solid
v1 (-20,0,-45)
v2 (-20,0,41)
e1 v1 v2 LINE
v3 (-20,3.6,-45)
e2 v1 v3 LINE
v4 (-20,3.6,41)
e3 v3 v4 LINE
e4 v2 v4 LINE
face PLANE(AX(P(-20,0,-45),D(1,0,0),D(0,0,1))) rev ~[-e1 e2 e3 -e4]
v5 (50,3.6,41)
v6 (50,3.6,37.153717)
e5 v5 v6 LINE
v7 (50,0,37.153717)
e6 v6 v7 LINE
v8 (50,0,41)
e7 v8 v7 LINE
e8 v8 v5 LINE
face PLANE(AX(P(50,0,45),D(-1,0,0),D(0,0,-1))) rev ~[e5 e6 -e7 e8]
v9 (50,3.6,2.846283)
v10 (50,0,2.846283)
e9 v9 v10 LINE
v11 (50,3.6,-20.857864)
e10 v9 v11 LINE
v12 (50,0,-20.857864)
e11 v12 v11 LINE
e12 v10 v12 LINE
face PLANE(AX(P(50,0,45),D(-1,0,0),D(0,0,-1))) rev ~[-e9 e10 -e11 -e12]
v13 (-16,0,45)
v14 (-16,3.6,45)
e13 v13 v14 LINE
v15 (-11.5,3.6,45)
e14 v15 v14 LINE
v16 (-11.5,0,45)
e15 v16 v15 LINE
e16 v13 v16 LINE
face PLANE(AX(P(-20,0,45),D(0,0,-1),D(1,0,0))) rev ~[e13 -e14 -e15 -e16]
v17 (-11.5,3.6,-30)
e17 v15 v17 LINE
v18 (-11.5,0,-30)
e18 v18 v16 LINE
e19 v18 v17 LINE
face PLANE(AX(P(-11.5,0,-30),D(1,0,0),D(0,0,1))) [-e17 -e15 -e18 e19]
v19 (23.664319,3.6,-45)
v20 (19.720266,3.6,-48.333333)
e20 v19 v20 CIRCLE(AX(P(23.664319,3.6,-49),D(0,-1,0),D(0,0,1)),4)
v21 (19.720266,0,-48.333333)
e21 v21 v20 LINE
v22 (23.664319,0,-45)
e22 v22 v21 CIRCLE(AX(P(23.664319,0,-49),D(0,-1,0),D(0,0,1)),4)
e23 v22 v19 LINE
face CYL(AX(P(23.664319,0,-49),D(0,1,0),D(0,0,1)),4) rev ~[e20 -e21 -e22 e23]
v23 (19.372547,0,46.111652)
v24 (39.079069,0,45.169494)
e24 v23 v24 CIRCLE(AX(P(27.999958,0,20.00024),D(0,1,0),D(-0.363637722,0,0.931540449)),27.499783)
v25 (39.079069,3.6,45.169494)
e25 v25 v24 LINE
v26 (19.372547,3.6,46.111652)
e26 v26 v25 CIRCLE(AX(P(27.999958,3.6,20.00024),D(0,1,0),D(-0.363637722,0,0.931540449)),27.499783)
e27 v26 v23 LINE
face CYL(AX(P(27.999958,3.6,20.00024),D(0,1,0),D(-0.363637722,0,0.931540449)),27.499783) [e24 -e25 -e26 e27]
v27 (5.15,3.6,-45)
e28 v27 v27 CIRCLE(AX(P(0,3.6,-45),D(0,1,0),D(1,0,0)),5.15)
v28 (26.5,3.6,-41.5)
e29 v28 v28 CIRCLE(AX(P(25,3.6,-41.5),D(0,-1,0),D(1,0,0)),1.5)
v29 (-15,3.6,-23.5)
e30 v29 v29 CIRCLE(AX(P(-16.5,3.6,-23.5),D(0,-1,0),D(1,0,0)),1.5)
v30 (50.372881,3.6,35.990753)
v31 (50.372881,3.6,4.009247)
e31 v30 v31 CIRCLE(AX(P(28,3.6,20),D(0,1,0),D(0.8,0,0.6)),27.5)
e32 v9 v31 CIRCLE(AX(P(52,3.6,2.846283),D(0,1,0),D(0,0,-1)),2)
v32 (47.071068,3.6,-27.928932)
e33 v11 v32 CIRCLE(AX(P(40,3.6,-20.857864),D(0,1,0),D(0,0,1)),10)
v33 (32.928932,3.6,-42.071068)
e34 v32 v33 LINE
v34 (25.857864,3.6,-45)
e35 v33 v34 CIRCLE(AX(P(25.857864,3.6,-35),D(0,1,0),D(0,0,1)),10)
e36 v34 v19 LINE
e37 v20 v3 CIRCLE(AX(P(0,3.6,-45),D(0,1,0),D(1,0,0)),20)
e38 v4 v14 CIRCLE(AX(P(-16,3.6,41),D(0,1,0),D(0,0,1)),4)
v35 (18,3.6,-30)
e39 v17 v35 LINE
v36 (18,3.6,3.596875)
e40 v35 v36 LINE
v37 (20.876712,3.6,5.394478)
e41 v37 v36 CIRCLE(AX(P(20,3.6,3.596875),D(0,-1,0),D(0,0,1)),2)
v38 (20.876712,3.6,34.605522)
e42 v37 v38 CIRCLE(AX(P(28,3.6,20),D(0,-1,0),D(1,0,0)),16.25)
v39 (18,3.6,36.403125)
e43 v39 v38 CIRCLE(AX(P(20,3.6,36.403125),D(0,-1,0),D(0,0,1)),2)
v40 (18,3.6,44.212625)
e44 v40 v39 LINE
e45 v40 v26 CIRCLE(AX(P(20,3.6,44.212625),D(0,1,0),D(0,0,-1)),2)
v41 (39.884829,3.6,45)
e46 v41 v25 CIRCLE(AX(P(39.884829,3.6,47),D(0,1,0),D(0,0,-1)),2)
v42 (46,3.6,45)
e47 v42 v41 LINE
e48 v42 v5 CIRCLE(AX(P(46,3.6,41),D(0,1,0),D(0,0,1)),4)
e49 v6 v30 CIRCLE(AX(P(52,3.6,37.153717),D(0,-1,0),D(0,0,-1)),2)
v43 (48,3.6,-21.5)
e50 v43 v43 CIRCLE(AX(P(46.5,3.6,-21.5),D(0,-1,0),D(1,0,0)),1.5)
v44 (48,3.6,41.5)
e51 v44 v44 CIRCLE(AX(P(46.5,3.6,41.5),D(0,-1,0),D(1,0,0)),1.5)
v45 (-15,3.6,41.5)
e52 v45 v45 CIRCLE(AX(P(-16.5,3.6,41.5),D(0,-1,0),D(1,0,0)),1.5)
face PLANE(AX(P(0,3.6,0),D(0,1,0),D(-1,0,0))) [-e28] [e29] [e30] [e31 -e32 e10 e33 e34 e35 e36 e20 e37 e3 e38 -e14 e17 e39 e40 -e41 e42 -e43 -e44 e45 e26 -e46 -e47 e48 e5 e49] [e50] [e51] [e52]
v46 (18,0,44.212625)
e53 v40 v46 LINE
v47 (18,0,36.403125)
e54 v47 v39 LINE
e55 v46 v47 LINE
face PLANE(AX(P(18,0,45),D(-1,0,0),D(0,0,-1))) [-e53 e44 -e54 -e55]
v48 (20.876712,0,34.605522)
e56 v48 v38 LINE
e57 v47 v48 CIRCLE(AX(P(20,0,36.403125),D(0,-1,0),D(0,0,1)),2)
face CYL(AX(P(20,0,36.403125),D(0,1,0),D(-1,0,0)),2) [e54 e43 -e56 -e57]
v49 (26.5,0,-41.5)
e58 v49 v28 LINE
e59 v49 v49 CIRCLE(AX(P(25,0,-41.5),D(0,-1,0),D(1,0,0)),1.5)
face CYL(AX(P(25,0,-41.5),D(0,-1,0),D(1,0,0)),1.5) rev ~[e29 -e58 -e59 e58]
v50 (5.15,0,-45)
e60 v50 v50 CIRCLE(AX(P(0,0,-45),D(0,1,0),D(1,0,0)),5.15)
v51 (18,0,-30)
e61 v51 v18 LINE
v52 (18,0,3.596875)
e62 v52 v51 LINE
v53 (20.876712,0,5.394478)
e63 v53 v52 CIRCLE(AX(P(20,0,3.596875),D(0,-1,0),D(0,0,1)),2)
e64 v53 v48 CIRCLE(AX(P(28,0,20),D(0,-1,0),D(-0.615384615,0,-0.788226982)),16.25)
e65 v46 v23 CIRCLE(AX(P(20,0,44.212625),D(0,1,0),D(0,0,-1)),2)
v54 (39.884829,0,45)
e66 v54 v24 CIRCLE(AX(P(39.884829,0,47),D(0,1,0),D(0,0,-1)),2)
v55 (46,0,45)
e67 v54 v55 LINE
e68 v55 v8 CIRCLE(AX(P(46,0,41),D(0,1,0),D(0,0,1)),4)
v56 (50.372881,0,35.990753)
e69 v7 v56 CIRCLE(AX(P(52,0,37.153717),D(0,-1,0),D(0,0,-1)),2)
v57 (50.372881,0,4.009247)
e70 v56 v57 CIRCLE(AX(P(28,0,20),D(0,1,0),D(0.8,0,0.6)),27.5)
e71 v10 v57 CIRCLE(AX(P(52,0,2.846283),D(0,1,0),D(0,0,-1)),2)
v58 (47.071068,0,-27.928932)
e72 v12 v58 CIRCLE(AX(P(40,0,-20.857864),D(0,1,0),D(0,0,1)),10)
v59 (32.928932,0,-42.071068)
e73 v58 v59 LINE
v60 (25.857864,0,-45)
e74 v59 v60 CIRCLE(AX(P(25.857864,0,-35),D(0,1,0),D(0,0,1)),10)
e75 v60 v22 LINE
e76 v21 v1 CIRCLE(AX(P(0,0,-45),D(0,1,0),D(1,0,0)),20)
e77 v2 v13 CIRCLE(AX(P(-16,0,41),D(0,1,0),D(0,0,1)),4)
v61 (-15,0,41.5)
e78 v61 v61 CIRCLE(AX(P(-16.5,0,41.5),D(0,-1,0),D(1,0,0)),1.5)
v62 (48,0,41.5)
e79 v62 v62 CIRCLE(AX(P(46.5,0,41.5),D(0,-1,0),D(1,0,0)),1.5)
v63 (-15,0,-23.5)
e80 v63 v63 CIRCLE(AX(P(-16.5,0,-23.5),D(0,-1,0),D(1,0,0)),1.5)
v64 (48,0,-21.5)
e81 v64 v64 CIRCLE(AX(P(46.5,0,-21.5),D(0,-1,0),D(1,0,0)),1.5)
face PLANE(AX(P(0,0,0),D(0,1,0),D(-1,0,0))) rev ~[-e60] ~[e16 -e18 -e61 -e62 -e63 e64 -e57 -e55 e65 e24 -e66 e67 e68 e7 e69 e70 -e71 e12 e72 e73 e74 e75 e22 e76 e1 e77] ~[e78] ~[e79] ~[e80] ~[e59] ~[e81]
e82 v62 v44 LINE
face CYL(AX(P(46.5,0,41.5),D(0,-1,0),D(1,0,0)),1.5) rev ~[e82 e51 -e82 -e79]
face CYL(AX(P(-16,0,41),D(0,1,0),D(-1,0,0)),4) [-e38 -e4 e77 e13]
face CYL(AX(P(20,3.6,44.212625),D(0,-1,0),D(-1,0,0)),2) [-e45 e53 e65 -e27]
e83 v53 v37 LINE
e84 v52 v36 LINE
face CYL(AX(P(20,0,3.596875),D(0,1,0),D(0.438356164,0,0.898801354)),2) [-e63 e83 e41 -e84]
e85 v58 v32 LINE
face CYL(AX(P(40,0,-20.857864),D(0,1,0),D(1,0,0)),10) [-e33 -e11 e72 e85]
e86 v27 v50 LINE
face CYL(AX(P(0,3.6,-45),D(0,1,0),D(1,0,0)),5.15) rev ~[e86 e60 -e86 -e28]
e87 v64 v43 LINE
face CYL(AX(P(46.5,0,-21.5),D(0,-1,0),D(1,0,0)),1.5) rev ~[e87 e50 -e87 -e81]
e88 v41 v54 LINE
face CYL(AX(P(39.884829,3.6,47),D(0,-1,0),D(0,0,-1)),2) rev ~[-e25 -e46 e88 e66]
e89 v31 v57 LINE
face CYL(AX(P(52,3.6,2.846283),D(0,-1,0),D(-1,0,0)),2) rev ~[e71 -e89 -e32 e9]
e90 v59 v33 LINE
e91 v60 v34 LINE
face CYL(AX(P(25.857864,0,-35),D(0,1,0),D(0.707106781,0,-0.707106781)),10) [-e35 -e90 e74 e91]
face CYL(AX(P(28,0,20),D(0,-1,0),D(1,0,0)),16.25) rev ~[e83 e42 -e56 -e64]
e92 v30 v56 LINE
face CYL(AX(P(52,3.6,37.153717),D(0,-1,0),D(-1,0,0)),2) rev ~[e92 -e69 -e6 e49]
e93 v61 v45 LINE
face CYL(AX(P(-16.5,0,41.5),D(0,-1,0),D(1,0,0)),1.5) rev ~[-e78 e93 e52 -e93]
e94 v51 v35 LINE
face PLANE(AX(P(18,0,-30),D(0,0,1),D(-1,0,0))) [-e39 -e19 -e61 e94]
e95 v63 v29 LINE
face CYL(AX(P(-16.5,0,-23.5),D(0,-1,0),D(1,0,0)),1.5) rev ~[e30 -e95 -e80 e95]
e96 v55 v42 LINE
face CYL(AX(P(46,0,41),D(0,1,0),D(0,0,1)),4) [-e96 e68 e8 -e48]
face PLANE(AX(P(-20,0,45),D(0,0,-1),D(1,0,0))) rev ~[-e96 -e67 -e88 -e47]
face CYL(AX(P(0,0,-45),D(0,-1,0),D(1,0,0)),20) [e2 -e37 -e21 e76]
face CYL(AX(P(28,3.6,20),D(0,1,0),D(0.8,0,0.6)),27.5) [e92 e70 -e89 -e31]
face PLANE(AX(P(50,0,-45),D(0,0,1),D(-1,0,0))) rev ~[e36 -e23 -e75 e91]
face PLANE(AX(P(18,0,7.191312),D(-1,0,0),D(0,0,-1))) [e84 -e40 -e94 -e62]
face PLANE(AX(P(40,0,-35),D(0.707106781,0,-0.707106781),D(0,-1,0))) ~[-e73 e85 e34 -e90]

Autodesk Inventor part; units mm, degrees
ref_plane "YZ Plane" through (0, 0, 0) normal (1, 0, 0) x (0, 1, 0)
ref_plane "XZ Plane" through (0, 0, 0) normal (0, 1, 0) x (-1, 0, 0)
ref_plane "XY Plane" through (0, 0, 0) normal (0, 0, 1) x (1, 0, 0)
sketch "Sketch1" plane through (0, 0, 0) normal (0, 1, 0) x (-1, 0, 0)
  line L0 (20, 45) -> (-20, 45)
  line L1 (-20, 45) -> (-20, -45)
  line L2 (-20, -45) -> (20, -45)
  line L3 (20, -45) -> (20, 45)
  line L4 (20, 45) -> (-20, -45) construction
  line L5 (-20, 45) -> (20, -45) construction
  arc A0 (-20, -45) -> (20, -45) centre (0, -45) ccw
  line L6 (20, -45) -> (20, -45)
  line L7 (20, -45) -> (20, 45)
  line L8 (20, 45) -> (20, 45)
  line L9 (20, 45) -> (20, -45)
  line L10 (-20, 45) -> (-50, 45)
  line L11 (-50, 45) -> (-50, -45)
  line L12 (-50, -45) -> (-20, -45)
  line L13 (-20, -45) -> (-20, 45)
  point P0 (0, 0)
  dimension "d0" = 40
  dimension "d1" = 90
  dimension "d7" = 0
  dimension "d8" = 90
  dimension "d35" = 30
extrude "Extrusion1" add sketch "Sketch1" along normal blind 3.6
sketch "Sketch2" plane through (0, 3.6, 0) normal (0, 1, 0) x (1, 0, 0)
  arc A0 (20, 45) -> (-20, 45) centre (0, 45) ccw projected
  circle A1 centre (0, 45) radius 5.15
  point P0 (0, 0)
  dimension "d4" = 10.3
extrude "Extrusion2" cut sketch "Sketch2" against normal blind 3.6
sketch "Sketch3" plane through (0, 0, 0) normal (0, -1, 0) x (1, 0, 0)
  line L0 (-20, 45) -> (50, 45) projected
  line L1 (-11.5, 45) -> (18, 45)
  line L2 (18, 45) -> (18, -30)
  line L3 (18, -30) -> (-11.5, -30)
  line L4 (-11.5, -30) -> (-11.5, 45)
  circle A0 centre (28, 20) radius 16.25
  line L5 (-20, -45) -> (-20, 45) projected
  line L6 (50, 45) -> (50, -45) projected
  point P0 (0, 0)
  point P1 (16, 45)
  dimension "d10" = 29.5
  dimension "d11" = 75
  dimension "d13" = 32.5
  dimension "d15" = 25
  dimension "d37" = 32
  dimension "d39" = 22
extrude "Extrusion3" cut sketch "Sketch3" against normal blind 10
fillet "Fillet2" radius 2 3 edges at (18, 1.8, 45) (18, 1.8, 32.8087) (18, 1.8, 7.1913)
fillet "Fillet3" radius 4 4 edges at (50, 1.8, 45) (-20, 1.8, 45) (20, 1.8, -45) (-20, 1.8, -45)
chamfer "Chamfer1" distance 20 angle 45 1 edges at (50, 1.8, -45)
fillet "Fillet4" radius 10 2 edges at (30, 1.8, -45) (50, 1.8, -25)
sketch "Sketch6" plane through (3.0674, 0, -14.7029) normal (0, -1, 0) x (1, 0, 0)
  circle A0 centre (21.9326, -26.7971) radius 1.5
  circle A1 centre (43.4326, -6.7971) radius 1.5
  circle A2 centre (43.4326, 56.2029) radius 1.5
  line L0 (25.8579, -30.2971) -> (23.6643, -30.2971)
  line L1 (46.9326, 55.7029) -> (46.9326, -5.2971)
  line L2 (-23.0674, -30.2971) -> (-23.0674, 55.7029)
  line L3 (-16, 59.7029) -> (42.9326, 59.7029)
  circle A3 centre (18.4326, 43) radius 1.75
  line L4 (-23.0674, -30.2971) -> (-23.0674, 55.7029) projected
  line L5 (16.9326, 59.7029) -> (42.9326, 59.7029) projected
  line L6 (46.9326, 55.7029) -> (46.9326, -6.155) projected
  line L7 (22.7905, -30.2971) -> (20.5969, -30.2971) projected
  point P0 (0, 0)
  dimension "d56" = 3
  dimension "d53" = 3
  dimension "d50" = 3
  dimension "d58" = 3.5
  dimension "d55" = 3.5
  dimension "d57" = 25
  dimension "d54" = 20
  dimension "d52" = 3.5
  dimension "d51" = 3.5
  dimension "d45" = 3.5
  dimension "d46" = 25
  dimension "d62" = 0
  dimension "d63" = 0
  dimension "d64" = 0
  dimension "d65" = 0
  dimension "d66" = 0
  dimension "d67" = 0
  dimension "d68" = 25
  dimension "d69" = 0
  dimension "d70" = 0
extrude "Extrusion6" cut sketch "Sketch6" against normal blind 10
sketch "Sketch7" plane through (33.0492, 0, -22.6689) normal (0, -1, 0) x (1, 0, 0)
  circle A0 centre (-49.5492, 64.1689) radius 1.5
  circle A1 centre (-49.5492, -0.8311) radius 1.5
  line L0 (-49.0492, 67.6689) -> (12.9508, 67.6689)
  line L1 (-53.0492, -23.8754) -> (-53.0492, 41)
  arc A2 (-53.0492, -23.8754) -> (-46.6341, -27.064) centre (-49.0492, -23.8754) ccw
  line L2 (-53.0492, -22.3311) -> (-53.0492, 63.6689) projected
  line L3 (-49.0492, 67.6689) -> (-44.5492, 67.6689) projected
  point P0 (0, 0)
  dimension "d74" = 3
  dimension "d71" = 3
  dimension "d76" = 3.5
  dimension "d75" = 3.5
  dimension "d73" = 3.5
  dimension "d72" = 65
  dimension "d80" = 0
  dimension "d81" = 0
extrude "Extrusion7" cut sketch "Sketch7" against normal blind 10
sketch "Sketch8" plane through (0, 0, 0) normal (0, -1, 0) x (1, 0, 0)
  point P0 (0, 0)
sketch "Sketch9" plane through (0, 3.6, 0) normal (0, 1, 0) x (1, 0, 0)
  line L0 (20, -45) -> (46, -45) projected
  line L1 (50, -41) -> (50, 20.8579) projected
  line L2 (18, -43) -> (18, -45.6174)
  arc A0 (18, -43) -> (20, -45) centre (20, -43) ccw projected
  arc A1 (18, -45.6174) -> (39.4564, -45) centre (28, -20) ccw
  arc A2 (50, -36.5) -> (50, -3.5) centre (28, -20) ccw
  point P0 (0, 0)
  dimension "d82" = 25
  dimension "d83" = 22
extrude "Extrusion8" add sketch "Sketch9" against normal blind 3.6
fillet "Fillet5" radius 2 4 edges at (18, 1.8, 45.6174) (50, 1.8, 36.5) (50, 1.8, 3.5) (39.4564, 1.8, 45)
properties part number "p1"
